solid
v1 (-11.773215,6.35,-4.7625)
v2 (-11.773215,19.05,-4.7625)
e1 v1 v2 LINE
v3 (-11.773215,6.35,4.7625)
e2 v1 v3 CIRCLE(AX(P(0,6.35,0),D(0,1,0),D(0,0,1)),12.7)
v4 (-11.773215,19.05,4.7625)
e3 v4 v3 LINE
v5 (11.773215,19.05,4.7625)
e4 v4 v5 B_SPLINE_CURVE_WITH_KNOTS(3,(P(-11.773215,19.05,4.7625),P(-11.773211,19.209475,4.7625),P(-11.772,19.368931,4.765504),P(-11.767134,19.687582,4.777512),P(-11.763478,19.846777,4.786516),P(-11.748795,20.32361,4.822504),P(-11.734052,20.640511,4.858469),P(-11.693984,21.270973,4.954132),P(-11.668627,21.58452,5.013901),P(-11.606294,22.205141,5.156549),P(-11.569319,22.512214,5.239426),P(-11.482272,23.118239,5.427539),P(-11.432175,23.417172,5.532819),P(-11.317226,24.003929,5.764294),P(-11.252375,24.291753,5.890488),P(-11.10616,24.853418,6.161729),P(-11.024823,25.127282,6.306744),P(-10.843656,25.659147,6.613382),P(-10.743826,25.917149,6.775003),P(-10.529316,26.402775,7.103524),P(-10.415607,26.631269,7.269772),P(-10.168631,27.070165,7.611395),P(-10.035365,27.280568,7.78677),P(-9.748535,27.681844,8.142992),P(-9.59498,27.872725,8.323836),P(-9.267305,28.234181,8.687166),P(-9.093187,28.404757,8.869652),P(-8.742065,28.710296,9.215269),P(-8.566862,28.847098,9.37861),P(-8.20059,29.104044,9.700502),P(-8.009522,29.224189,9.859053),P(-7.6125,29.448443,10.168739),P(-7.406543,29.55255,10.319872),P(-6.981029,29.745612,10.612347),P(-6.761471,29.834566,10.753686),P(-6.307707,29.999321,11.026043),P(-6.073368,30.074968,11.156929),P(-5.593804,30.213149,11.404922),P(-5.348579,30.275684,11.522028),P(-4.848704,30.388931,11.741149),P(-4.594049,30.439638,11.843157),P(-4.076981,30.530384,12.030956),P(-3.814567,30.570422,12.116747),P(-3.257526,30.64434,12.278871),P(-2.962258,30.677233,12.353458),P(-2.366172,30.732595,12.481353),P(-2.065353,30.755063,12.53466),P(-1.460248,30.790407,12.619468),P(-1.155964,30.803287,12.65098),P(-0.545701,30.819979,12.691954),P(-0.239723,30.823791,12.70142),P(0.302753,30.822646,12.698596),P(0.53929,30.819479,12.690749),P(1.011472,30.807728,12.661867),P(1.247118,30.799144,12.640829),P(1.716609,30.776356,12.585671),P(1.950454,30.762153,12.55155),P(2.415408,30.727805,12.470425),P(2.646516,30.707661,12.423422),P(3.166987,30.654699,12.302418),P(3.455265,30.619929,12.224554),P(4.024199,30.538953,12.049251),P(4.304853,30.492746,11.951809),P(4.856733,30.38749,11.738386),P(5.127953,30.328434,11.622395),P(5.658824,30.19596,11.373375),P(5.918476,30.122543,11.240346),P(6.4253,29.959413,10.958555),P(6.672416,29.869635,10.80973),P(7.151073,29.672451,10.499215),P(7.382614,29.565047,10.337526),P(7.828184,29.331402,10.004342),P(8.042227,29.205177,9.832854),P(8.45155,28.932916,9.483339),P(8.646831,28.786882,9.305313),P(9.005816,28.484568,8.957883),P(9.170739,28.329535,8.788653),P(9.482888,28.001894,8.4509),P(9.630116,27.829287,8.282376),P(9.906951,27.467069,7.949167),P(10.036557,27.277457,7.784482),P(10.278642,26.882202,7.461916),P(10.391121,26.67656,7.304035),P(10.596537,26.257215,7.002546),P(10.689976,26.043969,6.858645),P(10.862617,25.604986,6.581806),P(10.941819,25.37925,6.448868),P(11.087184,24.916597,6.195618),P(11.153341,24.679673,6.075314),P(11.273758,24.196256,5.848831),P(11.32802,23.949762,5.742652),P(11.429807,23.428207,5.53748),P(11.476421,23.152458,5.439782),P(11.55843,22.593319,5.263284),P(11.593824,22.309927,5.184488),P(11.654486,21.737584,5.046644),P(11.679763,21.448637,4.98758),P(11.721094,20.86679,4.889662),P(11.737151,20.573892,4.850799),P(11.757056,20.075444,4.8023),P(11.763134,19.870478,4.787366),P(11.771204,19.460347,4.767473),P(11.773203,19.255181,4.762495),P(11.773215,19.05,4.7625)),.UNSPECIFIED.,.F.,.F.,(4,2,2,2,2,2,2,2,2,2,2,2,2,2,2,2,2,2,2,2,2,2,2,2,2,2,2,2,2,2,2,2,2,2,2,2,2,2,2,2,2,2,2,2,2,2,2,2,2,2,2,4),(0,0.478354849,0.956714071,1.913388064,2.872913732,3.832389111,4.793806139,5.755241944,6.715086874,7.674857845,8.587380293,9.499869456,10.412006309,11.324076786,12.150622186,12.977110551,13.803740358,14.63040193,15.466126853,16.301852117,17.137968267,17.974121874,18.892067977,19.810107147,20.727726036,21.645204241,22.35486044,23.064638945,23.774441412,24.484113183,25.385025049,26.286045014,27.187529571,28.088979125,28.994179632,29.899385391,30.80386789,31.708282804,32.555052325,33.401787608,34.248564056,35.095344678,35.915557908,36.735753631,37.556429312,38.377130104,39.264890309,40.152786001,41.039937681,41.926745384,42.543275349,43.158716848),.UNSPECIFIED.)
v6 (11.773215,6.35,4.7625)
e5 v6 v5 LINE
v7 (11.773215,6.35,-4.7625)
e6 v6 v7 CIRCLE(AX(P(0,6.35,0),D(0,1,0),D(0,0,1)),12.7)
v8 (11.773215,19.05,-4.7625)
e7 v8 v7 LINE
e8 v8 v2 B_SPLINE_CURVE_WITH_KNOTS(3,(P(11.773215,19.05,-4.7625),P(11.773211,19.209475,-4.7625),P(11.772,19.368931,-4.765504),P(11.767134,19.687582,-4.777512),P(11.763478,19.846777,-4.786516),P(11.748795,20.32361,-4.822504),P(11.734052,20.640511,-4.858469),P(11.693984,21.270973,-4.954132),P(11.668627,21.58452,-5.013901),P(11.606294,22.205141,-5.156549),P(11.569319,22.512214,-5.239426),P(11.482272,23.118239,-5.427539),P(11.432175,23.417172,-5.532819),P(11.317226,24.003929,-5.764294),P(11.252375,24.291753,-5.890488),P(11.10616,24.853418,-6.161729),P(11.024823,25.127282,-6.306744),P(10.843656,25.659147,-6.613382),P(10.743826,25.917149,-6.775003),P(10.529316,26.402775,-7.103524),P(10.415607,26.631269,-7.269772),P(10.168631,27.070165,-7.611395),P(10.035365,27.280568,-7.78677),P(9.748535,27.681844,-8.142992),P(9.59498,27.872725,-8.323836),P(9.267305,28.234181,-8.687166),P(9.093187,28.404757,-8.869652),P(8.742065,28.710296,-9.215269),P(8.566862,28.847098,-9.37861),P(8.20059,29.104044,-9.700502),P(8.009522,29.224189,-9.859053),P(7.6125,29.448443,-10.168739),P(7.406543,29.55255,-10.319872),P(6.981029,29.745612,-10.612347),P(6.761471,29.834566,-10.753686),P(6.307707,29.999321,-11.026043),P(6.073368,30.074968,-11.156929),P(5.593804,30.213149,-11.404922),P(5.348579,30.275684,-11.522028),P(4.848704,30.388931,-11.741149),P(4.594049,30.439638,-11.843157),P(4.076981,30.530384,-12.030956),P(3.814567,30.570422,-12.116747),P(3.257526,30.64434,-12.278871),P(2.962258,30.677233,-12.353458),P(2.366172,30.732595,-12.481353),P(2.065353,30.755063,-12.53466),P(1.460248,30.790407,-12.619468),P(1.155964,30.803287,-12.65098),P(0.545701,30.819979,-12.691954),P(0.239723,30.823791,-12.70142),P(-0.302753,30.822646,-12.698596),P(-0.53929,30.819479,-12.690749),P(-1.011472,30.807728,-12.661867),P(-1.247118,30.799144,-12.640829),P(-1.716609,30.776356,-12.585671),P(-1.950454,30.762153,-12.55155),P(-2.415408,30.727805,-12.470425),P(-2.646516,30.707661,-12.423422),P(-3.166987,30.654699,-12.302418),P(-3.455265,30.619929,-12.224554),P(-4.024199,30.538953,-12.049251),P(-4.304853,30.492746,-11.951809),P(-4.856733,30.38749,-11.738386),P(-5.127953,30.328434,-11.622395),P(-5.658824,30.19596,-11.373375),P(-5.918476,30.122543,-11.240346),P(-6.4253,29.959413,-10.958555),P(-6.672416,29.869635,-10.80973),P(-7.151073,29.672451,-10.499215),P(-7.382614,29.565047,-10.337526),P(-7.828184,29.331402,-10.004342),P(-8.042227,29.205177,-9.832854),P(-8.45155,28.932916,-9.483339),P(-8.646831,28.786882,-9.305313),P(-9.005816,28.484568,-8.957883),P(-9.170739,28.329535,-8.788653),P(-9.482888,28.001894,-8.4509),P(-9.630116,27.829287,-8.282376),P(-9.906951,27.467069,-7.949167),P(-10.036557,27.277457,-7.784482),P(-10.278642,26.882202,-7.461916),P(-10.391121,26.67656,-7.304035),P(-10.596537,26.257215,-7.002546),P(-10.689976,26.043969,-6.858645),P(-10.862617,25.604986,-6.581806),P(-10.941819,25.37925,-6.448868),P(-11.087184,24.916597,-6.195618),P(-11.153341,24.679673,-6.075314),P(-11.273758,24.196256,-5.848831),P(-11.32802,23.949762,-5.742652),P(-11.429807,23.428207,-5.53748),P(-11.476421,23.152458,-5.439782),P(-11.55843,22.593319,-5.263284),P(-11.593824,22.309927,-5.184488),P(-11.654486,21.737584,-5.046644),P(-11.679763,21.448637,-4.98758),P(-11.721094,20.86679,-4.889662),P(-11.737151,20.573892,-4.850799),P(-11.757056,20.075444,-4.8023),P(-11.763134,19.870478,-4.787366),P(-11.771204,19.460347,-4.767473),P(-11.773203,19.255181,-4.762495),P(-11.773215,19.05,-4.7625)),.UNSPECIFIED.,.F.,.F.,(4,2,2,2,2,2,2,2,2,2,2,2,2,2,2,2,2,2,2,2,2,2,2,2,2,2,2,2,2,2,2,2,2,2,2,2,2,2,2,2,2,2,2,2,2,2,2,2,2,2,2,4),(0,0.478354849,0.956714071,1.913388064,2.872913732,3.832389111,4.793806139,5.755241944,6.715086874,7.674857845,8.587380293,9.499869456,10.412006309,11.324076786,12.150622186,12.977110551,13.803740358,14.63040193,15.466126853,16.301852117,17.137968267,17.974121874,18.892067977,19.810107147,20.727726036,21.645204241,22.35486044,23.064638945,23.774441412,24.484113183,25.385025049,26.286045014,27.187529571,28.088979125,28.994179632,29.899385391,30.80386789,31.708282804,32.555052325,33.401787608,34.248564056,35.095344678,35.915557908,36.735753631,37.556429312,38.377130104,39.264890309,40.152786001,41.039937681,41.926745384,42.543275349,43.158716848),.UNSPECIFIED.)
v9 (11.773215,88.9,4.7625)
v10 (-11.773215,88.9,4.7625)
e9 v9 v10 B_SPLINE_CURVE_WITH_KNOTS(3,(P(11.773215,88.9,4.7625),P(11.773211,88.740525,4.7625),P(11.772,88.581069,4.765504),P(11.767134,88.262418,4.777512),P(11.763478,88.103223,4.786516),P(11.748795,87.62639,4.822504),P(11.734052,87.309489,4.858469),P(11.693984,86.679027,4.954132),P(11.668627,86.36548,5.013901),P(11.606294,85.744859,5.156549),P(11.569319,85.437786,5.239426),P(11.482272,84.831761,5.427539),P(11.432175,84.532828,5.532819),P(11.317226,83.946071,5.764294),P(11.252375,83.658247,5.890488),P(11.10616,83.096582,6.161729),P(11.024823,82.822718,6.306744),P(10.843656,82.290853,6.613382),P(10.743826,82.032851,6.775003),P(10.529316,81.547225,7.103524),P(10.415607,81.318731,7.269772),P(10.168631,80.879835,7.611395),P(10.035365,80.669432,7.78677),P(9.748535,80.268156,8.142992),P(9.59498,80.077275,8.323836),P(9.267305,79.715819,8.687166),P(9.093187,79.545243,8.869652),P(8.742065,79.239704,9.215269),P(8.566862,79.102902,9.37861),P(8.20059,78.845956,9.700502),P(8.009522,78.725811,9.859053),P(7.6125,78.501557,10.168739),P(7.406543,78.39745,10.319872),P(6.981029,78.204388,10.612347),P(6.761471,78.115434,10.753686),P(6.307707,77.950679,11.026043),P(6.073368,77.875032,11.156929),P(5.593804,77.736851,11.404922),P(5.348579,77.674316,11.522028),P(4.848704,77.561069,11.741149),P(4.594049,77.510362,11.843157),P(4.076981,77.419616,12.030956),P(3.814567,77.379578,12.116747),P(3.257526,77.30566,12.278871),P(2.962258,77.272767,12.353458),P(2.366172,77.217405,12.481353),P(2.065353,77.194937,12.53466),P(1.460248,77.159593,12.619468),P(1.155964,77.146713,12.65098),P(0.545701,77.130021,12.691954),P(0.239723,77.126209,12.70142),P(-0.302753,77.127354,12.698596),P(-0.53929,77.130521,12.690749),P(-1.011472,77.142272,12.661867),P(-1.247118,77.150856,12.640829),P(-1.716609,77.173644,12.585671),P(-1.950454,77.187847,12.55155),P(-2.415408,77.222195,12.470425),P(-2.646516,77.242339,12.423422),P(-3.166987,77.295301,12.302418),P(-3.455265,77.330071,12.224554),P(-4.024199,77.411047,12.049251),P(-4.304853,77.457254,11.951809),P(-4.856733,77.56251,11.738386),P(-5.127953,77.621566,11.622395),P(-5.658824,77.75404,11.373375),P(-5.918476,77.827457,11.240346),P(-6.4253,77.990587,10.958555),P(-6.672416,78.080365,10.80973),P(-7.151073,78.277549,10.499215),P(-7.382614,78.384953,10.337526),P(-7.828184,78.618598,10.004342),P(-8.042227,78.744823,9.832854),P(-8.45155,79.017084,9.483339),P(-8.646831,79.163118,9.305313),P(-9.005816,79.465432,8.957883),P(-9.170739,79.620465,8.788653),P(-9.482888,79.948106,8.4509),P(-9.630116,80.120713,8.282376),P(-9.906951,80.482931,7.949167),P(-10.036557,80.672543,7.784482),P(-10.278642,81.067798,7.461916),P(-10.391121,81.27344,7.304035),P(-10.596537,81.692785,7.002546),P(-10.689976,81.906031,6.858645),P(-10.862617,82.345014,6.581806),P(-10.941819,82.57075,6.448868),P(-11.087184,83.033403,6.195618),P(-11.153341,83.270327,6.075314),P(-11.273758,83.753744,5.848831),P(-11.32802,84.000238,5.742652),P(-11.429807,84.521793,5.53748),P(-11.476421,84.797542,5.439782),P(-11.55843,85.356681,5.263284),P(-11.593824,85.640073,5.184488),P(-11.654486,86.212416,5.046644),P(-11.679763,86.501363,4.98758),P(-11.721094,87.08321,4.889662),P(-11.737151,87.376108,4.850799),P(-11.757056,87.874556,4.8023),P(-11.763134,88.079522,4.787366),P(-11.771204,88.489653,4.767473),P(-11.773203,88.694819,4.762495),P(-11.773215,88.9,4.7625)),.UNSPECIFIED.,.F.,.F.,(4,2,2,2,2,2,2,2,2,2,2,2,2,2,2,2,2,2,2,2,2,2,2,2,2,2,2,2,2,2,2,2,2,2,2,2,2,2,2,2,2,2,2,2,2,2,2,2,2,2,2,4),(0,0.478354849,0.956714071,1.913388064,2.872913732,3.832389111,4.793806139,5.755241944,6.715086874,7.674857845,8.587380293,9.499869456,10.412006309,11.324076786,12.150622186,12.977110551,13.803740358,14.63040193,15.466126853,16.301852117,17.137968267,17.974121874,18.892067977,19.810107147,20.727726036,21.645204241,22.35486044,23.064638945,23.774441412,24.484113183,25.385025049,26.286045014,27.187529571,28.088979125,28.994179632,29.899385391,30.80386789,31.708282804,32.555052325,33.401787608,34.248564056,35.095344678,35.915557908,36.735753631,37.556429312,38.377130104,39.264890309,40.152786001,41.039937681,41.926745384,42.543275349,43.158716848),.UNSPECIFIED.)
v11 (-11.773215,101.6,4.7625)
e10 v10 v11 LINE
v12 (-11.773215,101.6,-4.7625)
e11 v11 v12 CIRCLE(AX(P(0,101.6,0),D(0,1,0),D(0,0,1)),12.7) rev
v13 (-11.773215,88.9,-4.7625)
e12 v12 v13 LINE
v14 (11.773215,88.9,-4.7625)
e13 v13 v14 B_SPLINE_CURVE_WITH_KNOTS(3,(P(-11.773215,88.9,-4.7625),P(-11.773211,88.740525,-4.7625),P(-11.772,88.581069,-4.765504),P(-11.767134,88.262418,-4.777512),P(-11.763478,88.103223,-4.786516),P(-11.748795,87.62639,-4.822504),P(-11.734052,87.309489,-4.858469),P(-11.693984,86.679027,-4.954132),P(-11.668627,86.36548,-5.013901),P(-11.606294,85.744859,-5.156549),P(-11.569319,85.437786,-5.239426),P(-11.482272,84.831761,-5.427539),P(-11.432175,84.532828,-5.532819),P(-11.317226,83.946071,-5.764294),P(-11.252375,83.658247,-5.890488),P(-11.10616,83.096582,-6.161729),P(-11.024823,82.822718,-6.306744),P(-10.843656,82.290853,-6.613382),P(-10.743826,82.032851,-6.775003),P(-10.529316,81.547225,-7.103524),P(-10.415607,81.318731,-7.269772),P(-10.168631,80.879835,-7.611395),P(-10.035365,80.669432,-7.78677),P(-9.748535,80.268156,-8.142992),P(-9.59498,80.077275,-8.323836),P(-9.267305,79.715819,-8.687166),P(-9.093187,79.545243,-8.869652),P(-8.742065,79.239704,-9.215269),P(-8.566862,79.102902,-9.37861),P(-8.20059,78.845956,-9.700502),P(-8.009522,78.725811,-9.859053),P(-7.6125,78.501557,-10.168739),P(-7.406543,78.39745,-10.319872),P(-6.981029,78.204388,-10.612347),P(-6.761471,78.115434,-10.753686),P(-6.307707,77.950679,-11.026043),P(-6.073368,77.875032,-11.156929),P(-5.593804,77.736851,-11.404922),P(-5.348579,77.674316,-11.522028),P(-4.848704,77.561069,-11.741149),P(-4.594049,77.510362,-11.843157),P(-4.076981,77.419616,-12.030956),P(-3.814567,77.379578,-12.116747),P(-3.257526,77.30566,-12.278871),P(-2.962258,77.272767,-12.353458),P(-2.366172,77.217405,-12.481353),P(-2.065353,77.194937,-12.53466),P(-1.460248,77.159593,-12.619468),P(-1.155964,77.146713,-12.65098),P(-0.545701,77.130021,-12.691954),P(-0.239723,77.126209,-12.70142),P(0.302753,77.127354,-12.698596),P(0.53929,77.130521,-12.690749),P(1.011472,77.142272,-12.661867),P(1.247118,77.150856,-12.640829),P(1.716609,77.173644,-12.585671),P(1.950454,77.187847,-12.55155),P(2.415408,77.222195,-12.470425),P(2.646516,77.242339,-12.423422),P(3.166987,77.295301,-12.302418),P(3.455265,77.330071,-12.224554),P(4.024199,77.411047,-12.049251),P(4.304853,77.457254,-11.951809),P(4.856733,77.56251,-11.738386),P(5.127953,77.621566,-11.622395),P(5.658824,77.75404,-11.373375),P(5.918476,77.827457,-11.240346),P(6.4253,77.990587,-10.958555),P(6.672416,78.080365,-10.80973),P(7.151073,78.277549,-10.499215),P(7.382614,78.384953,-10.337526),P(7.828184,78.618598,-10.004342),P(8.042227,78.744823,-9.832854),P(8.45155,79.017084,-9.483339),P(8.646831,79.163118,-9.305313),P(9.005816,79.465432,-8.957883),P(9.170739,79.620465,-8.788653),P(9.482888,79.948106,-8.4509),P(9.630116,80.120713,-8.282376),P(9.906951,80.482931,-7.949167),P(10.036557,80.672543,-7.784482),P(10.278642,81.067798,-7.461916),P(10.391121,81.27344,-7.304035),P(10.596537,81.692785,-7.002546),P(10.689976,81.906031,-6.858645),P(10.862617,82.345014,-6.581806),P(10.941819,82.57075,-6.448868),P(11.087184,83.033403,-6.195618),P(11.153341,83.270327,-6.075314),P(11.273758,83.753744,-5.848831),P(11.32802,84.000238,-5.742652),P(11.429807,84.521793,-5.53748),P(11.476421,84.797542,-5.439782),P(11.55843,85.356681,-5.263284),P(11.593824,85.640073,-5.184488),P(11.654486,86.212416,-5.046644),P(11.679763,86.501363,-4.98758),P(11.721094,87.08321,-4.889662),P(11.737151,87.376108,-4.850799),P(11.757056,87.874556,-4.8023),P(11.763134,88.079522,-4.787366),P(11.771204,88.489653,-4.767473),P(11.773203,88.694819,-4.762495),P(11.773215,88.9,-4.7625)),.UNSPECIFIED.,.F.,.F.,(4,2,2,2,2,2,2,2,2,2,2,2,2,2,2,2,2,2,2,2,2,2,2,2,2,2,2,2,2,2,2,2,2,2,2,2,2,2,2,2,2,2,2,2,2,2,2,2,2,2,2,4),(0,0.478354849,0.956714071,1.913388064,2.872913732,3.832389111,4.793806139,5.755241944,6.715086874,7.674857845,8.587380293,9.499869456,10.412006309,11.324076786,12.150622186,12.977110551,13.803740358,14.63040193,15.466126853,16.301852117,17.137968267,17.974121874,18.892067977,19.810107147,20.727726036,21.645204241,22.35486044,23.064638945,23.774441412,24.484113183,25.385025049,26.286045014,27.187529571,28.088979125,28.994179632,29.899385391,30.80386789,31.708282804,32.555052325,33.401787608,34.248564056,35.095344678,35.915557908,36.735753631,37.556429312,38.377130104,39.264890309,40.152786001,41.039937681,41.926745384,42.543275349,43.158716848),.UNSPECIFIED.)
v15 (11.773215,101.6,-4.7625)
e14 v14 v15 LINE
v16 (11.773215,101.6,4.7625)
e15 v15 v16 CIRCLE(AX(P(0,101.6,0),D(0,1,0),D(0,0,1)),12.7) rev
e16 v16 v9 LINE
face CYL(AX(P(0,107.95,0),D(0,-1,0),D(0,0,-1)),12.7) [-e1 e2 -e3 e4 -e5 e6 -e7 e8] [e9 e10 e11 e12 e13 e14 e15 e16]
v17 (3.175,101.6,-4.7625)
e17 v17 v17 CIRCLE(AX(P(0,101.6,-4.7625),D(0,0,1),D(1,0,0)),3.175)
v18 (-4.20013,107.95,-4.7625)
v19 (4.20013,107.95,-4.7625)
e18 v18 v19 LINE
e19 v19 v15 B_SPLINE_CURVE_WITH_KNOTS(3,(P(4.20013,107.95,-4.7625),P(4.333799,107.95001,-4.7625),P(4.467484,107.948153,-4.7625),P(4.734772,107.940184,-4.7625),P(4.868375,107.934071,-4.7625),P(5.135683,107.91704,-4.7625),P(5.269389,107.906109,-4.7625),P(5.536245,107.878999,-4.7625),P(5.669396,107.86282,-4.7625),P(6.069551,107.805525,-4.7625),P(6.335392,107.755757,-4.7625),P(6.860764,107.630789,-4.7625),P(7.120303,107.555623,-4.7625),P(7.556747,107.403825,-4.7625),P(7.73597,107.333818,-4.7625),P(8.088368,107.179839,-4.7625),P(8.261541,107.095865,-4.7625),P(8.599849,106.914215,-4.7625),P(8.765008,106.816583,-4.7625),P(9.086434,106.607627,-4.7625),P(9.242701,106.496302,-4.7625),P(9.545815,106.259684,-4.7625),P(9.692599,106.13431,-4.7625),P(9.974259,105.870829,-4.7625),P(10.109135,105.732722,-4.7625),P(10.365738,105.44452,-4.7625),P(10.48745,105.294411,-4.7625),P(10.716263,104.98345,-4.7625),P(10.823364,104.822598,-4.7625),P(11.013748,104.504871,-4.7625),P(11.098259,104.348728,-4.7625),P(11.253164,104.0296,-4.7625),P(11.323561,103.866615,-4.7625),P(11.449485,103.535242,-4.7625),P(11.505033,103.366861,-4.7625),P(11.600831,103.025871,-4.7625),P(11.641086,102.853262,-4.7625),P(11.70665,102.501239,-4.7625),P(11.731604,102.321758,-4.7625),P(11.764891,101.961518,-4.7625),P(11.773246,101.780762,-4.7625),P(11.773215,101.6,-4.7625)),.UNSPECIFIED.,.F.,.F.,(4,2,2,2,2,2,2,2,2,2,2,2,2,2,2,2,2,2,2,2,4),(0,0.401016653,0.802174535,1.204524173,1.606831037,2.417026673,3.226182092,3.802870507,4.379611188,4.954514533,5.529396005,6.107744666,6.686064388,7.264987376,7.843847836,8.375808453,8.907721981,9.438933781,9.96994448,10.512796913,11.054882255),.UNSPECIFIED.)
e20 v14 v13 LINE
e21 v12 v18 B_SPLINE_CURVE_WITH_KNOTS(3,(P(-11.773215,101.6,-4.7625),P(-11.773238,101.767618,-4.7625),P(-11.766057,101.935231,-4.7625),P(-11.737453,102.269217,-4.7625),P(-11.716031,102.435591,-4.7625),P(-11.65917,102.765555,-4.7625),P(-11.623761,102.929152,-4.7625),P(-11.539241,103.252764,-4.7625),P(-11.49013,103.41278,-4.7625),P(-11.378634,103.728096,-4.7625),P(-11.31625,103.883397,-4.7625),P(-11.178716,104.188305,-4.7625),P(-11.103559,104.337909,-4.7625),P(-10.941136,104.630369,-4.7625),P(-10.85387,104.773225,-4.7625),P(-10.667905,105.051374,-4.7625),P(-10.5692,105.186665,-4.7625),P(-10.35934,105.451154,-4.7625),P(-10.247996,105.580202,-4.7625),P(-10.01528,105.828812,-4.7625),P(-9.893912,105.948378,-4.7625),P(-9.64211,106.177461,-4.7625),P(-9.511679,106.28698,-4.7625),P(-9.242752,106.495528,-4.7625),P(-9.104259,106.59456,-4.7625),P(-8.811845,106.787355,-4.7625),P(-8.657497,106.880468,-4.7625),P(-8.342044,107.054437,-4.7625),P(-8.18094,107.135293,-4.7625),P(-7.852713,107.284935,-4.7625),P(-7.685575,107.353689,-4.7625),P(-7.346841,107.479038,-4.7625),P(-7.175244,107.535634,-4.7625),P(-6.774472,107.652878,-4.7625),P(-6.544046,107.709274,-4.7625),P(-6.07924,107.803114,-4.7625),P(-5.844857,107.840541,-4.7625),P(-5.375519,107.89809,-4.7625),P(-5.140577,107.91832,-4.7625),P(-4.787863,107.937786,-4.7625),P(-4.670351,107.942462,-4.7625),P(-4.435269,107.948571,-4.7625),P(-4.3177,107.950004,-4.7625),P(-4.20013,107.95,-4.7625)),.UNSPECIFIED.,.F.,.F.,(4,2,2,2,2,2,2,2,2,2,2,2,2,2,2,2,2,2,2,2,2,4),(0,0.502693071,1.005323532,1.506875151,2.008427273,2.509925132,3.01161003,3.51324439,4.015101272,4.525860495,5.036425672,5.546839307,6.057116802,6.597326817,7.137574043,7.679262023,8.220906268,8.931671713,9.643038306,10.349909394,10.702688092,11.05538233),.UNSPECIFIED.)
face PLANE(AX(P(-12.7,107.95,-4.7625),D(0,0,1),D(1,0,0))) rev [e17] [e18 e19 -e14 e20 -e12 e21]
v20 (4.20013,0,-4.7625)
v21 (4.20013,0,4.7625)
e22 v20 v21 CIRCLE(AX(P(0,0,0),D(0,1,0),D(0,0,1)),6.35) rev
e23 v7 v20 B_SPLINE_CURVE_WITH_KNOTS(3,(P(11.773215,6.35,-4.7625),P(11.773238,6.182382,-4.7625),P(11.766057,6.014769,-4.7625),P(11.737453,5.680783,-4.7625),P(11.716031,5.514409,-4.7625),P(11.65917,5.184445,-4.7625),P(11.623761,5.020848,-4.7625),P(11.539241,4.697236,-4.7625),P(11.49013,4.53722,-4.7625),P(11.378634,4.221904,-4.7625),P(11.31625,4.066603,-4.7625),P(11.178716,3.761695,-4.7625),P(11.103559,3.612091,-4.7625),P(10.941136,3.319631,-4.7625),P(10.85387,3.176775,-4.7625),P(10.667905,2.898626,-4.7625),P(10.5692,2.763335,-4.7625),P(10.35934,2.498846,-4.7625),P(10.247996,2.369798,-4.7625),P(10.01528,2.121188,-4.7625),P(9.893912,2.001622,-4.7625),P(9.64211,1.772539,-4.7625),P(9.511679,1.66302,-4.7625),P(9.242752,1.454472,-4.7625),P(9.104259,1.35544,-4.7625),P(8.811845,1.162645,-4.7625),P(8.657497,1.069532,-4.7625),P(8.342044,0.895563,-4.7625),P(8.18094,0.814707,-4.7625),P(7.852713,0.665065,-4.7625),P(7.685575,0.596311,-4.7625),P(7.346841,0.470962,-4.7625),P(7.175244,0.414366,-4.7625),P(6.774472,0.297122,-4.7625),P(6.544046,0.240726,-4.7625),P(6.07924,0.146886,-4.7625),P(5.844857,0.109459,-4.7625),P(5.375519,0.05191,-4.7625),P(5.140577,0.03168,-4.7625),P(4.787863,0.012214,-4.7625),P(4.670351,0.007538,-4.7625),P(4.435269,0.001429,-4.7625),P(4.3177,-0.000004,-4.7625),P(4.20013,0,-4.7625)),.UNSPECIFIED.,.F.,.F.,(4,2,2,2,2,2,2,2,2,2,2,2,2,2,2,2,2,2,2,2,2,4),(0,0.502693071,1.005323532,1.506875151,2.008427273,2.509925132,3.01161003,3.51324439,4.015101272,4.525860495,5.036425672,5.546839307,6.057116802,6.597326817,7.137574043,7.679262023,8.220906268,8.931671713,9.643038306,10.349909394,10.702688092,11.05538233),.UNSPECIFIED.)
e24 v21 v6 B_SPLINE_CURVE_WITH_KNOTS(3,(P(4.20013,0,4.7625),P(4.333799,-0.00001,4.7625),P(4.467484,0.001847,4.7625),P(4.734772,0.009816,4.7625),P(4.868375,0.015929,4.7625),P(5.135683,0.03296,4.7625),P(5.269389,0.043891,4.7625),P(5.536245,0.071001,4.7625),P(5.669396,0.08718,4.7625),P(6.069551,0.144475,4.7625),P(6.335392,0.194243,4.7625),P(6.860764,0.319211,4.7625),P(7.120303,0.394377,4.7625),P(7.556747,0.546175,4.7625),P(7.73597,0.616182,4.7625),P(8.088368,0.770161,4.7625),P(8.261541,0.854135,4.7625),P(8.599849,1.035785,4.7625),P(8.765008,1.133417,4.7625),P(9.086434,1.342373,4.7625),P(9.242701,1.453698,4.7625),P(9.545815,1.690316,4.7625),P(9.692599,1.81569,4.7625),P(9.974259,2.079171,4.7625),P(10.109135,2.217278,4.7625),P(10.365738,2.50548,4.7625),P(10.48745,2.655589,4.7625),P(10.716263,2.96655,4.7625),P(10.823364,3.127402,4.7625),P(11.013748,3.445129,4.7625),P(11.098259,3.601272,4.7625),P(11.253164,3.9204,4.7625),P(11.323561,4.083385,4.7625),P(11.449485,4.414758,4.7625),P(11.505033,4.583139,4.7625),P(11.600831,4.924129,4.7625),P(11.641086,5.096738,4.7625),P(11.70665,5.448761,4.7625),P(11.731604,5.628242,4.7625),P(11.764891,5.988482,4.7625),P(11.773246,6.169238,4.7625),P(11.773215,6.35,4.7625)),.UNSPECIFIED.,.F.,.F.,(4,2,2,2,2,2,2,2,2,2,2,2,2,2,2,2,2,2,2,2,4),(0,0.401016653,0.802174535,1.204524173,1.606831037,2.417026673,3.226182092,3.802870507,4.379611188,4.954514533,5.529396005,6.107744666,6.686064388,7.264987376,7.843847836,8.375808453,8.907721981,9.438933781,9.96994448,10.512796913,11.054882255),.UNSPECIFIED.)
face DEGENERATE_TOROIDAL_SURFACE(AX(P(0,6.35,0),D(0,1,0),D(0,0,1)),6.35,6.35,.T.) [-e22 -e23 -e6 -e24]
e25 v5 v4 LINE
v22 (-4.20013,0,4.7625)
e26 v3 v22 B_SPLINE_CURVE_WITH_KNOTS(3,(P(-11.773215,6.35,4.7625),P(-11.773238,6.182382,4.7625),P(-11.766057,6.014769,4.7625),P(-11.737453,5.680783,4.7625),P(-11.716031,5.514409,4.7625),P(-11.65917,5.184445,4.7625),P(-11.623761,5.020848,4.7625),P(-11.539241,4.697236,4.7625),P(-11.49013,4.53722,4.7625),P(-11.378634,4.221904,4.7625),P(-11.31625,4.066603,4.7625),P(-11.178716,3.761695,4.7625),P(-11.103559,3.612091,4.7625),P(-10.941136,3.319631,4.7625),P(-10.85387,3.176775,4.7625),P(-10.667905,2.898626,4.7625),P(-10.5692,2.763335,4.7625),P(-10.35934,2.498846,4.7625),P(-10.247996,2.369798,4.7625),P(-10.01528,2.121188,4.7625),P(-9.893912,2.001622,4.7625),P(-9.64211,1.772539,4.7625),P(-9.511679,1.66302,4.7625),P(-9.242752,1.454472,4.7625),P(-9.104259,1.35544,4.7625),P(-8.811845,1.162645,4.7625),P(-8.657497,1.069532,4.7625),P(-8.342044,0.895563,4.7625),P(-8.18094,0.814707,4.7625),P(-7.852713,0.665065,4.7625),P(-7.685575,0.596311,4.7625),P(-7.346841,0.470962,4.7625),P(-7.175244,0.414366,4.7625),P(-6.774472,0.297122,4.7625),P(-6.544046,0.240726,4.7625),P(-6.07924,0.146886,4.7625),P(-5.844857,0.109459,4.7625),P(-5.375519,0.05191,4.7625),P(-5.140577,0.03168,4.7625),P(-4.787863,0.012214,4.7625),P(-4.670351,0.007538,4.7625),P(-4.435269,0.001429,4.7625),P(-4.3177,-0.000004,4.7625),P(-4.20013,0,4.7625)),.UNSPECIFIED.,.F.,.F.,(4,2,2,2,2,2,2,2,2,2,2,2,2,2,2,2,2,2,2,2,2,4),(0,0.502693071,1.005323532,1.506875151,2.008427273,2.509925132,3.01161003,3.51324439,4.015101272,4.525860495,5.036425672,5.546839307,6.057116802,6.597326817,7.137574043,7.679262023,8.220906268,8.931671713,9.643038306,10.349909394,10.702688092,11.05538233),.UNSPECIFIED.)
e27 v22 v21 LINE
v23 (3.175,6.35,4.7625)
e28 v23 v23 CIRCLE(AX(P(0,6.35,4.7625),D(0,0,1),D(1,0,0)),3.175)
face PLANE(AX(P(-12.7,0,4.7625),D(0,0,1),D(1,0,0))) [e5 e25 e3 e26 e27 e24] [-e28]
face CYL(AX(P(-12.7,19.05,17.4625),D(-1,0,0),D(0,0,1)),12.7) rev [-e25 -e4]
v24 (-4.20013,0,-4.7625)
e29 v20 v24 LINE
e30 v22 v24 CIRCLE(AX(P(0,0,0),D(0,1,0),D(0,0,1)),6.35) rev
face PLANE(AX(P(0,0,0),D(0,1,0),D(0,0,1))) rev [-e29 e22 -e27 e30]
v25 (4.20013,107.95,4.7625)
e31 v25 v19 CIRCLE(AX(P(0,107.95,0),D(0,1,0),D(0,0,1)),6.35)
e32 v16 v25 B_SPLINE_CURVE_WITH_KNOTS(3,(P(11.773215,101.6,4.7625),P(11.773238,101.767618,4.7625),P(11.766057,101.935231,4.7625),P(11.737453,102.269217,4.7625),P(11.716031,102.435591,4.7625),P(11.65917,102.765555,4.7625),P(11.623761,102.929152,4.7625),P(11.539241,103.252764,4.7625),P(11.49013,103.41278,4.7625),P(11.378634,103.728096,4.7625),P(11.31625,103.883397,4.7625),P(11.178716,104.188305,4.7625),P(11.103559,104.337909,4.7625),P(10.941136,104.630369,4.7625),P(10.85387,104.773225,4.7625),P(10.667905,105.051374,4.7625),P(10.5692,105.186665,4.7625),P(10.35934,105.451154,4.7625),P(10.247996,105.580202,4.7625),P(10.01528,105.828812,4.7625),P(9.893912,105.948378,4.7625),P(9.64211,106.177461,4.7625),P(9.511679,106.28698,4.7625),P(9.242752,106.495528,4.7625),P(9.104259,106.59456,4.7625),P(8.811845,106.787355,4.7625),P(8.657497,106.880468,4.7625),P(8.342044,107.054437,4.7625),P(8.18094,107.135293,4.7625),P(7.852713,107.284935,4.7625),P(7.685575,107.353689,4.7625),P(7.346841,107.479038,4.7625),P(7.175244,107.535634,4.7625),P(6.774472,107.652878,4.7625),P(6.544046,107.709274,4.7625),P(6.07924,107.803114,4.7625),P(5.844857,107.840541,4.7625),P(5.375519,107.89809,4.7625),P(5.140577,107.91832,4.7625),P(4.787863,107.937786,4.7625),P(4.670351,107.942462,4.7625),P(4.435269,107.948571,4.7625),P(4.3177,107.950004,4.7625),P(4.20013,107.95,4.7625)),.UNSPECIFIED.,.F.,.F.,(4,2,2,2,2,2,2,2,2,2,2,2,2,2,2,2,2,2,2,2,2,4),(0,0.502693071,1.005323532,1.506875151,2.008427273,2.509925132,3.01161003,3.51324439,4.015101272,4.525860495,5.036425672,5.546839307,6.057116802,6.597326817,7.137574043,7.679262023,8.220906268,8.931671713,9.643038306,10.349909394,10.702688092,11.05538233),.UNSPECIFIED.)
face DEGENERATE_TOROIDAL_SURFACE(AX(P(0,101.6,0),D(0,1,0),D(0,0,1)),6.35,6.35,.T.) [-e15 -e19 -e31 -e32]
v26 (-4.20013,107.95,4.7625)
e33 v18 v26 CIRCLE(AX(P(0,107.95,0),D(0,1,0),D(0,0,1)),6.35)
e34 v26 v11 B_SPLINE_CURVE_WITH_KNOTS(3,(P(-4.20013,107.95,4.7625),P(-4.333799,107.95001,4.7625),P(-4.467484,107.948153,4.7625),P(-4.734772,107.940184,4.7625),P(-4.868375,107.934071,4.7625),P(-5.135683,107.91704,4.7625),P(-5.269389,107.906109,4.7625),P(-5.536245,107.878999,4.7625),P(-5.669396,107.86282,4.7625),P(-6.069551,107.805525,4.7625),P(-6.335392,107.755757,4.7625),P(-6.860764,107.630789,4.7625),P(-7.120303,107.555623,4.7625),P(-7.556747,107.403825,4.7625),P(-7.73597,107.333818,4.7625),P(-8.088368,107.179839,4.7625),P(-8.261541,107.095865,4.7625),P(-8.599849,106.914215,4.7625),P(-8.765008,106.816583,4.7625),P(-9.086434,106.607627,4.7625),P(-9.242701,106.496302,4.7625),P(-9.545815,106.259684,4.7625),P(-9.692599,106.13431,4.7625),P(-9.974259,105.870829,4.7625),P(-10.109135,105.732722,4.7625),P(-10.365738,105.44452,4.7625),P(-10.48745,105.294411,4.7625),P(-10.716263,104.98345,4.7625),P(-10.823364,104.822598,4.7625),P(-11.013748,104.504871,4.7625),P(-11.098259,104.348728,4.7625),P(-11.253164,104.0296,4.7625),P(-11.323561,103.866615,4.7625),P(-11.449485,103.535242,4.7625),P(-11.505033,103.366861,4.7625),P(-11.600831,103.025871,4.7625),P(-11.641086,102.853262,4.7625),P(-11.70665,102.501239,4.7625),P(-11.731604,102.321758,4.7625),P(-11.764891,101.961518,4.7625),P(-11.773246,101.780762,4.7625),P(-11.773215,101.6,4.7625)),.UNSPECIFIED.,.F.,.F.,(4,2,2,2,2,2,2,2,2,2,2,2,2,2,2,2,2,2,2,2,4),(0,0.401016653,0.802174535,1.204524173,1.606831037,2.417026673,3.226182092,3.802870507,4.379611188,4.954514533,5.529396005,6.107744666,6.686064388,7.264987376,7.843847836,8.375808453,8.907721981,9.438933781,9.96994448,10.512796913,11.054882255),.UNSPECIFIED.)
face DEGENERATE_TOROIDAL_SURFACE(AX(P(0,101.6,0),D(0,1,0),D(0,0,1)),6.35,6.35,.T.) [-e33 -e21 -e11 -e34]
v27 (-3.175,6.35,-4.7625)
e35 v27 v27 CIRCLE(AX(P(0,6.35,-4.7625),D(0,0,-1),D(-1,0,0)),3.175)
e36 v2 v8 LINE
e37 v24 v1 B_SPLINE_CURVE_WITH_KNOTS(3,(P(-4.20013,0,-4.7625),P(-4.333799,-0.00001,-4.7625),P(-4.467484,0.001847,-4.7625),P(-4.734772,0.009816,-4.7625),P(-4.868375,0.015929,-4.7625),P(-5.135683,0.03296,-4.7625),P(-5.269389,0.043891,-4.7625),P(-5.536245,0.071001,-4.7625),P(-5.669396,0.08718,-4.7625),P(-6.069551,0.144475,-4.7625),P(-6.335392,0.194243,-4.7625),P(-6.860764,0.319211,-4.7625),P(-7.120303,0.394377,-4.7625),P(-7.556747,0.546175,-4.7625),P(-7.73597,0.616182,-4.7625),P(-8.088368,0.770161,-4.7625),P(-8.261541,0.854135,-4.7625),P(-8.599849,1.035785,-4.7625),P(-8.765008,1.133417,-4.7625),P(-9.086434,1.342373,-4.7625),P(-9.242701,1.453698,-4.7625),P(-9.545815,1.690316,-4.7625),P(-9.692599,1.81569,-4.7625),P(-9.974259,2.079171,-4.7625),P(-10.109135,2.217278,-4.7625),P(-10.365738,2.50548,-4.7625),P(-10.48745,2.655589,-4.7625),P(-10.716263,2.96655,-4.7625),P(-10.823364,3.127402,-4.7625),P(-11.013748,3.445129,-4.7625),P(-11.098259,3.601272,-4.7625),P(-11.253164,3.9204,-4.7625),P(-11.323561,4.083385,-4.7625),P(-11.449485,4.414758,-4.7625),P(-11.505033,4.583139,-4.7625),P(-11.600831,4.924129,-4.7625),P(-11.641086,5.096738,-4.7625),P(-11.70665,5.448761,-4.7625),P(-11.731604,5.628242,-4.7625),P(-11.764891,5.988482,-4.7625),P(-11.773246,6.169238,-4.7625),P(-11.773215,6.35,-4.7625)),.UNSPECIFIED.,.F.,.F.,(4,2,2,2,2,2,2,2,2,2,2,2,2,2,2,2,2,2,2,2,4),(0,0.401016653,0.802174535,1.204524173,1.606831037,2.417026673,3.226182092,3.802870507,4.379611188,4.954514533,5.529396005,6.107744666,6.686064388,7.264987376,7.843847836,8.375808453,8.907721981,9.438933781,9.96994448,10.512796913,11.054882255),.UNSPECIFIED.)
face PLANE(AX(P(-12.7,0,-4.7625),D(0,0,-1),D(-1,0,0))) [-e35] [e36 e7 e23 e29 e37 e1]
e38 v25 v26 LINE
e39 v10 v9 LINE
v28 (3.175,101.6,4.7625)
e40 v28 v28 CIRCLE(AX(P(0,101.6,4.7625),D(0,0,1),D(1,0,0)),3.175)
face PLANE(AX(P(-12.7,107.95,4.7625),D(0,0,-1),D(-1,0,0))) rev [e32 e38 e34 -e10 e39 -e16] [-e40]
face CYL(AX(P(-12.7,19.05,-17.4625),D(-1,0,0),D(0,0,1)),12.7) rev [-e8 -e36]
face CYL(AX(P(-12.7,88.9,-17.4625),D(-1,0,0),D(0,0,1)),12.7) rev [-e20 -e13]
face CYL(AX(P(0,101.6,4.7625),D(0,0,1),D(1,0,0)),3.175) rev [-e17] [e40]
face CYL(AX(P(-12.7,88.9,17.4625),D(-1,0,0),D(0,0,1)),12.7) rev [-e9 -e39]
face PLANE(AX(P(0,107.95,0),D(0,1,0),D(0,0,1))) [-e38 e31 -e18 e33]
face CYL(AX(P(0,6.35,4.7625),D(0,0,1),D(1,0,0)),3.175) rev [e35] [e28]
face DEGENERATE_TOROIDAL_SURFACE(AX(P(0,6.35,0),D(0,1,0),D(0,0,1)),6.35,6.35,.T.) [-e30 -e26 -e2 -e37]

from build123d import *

# Parameters (mm, degrees)
SKETCH1_R           = 12.7
BOSS_EXTRUDE1_DEPTH = 107.95
SKETCH2_W           = 7.9375
SKETCH2_H           = 31.75
CUT_EXTRUDE1_DEPTH  = 112.622813528
FILLET1_R           = 12.7
MIRROR1_START       = -11.773215198
MIRROR1_DEPTH       = 23.546430296
HOLE1_D             = 6.35
FILLET6_R           = 6.35


# Read off the part's stored shape, not the designer's step: Mirror1
with BuildPart() as part:
    # Sketch1 → Boss-Extrude1 (new body)
    with BuildSketch(Plane(origin=(0, 0, 0), x_dir=(1, 0, 0), z_dir=(0, 1, 0))):
        with Locations(Location((0, 0, 0), (0, 0, 270))):
            Circle(SKETCH1_R)
    extrude(amount=BOSS_EXTRUDE1_DEPTH)

    # Sketch2 → Cut-Extrude1 (cut, through all)
    with BuildSketch(Plane(origin=(12.7, 0, 0), x_dir=(0, 0, -1), z_dir=(1, 0, 0))):
        with Locations((8.73125, 92.075)):
            Rectangle(SKETCH2_W, SKETCH2_H)
        with Locations((-8.73125, 92.075)):
            Rectangle(SKETCH2_W, SKETCH2_H)
    extrude(amount=-CUT_EXTRUDE1_DEPTH, mode=Mode.SUBTRACT)

    # Fillet1
    # the kernel refuses this fillet: 12.7 mm, written as the material it adds along each edge
    with BuildSketch(Plane(origin=(43.523215098, 76.2, 4.7625), x_dir=(0, 1, 0), z_dir=(-1, 0, 0))) as fillet1_piece_1_section:
        with BuildLine():
            CenterArc((FILLET1_R, -FILLET1_R), FILLET1_R, 90, 90)
            Line((0, -FILLET1_R), (0, 0))
            Line((0, 0), (FILLET1_R, 0))
        make_face()
    fillet1_piece_1 = extrude(amount=87.046430197, mode=Mode.PRIVATE)
    fillet1_piece_1 = fillet1_piece_1 & Plane(origin=(0, 79.544884305, 0), x_dir=(0, 0, 1), z_dir=(0, -1, 0)) * Cylinder(12.7, 225, mode=Mode.PRIVATE)
    add(fillet1_piece_1)
    with BuildSketch(Plane(origin=(43.523215098, 76.2, -4.7625), x_dir=(0, 0, -1), z_dir=(-1, 0, 0))) as fillet1_piece_2_section:
        with BuildLine():
            CenterArc((FILLET1_R, -FILLET1_R), FILLET1_R, 90, 90)
            Line((0, -FILLET1_R), (0, 0))
            Line((0, 0), (FILLET1_R, 0))
        make_face()
    fillet1_piece_2 = extrude(amount=87.046430197, mode=Mode.PRIVATE)
    fillet1_piece_2 = fillet1_piece_2 & Plane(origin=(0, 79.544821944, 0), x_dir=(0, 0, 1), z_dir=(0, -1, 0)) * Cylinder(12.7, 225, mode=Mode.PRIVATE)
    add(fillet1_piece_2)

    # Mirror1 outline → Mirror1 (cut)
    with BuildSketch(Plane.YZ.offset(MIRROR1_START)):
        with BuildLine():
            Line((19.05, -4.7625), (0, -4.7625))
            Line((0, -4.7625), (0, -14))
            Line((0, -14), (31.349026101, -14))
            Line((31.349026101, -14), (30.823419426, -12.700505142))
            ThreePointArc((30.823419426, -12.700505142), (26.149741731, -6.932368598), (19.05, -4.7625))
        make_face()
        with BuildLine():
            Line((0, 14), (0, 4.7625))
            Line((0, 4.7625), (19.05, 4.7625))
            ThreePointArc((19.05, 4.7625), (26.149741731, 6.932368598), (30.823419426, 12.700505142))
            Line((30.823419426, 12.700505142), (31.349026101, 14))
            Line((31.349026101, 14), (0, 14))
        make_face()
    extrude(amount=MIRROR1_DEPTH, mode=Mode.SUBTRACT)

    # Hole1 (through all)
    with Locations(Plane.XY.offset(4.7625)):
        with Locations((0, 101.6), (0, 6.35)):
            Hole(HOLE1_D / 2)

    # Fillet6
    # the kernel refuses this fillet: 6.35 mm, written as the material it takes off along each edge
    with BuildSketch(Plane(origin=(0, 107.95, 0), x_dir=(-0.06367759150342109, 0, 0.9979705227812711), z_dir=(-0.9979705227812711, 0, -0.06367759150342109))) as fillet6_piece_1:
        with BuildLine():
            CenterArc((12.7 - FILLET6_R, -FILLET6_R), FILLET6_R, 0, 90)
            Line((12.7 - FILLET6_R, 0), (12.7, 0))
            Line((12.7, 0), (12.7, -FILLET6_R))
        make_face()
    revolve(axis=Axis((0, 107.95, 0), (0, 1, 0)), revolution_arc=187.301854803, mode=Mode.SUBTRACT)
    with BuildSketch(Plane(origin=(0, 0, 0), x_dir=(0.06367758856259068, 0, -0.9979705229689169), z_dir=(0.9979705229689169, 0, 0.06367758856259068))) as fillet6_piece_2:
        with BuildLine():
            CenterArc((12.7 - FILLET6_R, FILLET6_R), FILLET6_R, 270, 90)
            Line((12.7 - FILLET6_R, 0), (12.7, 0))
            Line((12.7, 0), (12.7, FILLET6_R))
        make_face()
    revolve(axis=Axis((0, 0, 0), (0, 1, 0)), revolution_arc=187.301854466, mode=Mode.SUBTRACT)
    with BuildSketch(Plane(origin=(0, 107.95, 0), x_dir=(0.06367759150341921, 0, -0.9979705227812712), z_dir=(0.9979705227812712, 0, 0.06367759150341921))) as fillet6_piece_3:
        with BuildLine():
            CenterArc((12.7 - FILLET6_R, -FILLET6_R), FILLET6_R, 0, 90)
            Line((12.7 - FILLET6_R, 0), (12.7, 0))
            Line((12.7, 0), (12.7, -FILLET6_R))
        make_face()
    revolve(axis=Axis((0, 107.95, 0), (0, 1, 0)), revolution_arc=187.301854803, mode=Mode.SUBTRACT)
    with BuildSketch(Plane(origin=(0, 0, 0), x_dir=(-0.06367759151119771, 0, 0.9979705227807748), z_dir=(-0.9979705227807748, 0, -0.06367759151119771))) as fillet6_piece_4:
        with BuildLine():
            CenterArc((12.7 - FILLET6_R, FILLET6_R), FILLET6_R, 270, 90)
            Line((12.7 - FILLET6_R, 0), (12.7, 0))
            Line((12.7, 0), (12.7, FILLET6_R))
        make_face()
    revolve(axis=Axis((0, 0, 0), (0, 1, 0)), revolution_arc=187.301854804, mode=Mode.SUBTRACT)


solid = part.part
